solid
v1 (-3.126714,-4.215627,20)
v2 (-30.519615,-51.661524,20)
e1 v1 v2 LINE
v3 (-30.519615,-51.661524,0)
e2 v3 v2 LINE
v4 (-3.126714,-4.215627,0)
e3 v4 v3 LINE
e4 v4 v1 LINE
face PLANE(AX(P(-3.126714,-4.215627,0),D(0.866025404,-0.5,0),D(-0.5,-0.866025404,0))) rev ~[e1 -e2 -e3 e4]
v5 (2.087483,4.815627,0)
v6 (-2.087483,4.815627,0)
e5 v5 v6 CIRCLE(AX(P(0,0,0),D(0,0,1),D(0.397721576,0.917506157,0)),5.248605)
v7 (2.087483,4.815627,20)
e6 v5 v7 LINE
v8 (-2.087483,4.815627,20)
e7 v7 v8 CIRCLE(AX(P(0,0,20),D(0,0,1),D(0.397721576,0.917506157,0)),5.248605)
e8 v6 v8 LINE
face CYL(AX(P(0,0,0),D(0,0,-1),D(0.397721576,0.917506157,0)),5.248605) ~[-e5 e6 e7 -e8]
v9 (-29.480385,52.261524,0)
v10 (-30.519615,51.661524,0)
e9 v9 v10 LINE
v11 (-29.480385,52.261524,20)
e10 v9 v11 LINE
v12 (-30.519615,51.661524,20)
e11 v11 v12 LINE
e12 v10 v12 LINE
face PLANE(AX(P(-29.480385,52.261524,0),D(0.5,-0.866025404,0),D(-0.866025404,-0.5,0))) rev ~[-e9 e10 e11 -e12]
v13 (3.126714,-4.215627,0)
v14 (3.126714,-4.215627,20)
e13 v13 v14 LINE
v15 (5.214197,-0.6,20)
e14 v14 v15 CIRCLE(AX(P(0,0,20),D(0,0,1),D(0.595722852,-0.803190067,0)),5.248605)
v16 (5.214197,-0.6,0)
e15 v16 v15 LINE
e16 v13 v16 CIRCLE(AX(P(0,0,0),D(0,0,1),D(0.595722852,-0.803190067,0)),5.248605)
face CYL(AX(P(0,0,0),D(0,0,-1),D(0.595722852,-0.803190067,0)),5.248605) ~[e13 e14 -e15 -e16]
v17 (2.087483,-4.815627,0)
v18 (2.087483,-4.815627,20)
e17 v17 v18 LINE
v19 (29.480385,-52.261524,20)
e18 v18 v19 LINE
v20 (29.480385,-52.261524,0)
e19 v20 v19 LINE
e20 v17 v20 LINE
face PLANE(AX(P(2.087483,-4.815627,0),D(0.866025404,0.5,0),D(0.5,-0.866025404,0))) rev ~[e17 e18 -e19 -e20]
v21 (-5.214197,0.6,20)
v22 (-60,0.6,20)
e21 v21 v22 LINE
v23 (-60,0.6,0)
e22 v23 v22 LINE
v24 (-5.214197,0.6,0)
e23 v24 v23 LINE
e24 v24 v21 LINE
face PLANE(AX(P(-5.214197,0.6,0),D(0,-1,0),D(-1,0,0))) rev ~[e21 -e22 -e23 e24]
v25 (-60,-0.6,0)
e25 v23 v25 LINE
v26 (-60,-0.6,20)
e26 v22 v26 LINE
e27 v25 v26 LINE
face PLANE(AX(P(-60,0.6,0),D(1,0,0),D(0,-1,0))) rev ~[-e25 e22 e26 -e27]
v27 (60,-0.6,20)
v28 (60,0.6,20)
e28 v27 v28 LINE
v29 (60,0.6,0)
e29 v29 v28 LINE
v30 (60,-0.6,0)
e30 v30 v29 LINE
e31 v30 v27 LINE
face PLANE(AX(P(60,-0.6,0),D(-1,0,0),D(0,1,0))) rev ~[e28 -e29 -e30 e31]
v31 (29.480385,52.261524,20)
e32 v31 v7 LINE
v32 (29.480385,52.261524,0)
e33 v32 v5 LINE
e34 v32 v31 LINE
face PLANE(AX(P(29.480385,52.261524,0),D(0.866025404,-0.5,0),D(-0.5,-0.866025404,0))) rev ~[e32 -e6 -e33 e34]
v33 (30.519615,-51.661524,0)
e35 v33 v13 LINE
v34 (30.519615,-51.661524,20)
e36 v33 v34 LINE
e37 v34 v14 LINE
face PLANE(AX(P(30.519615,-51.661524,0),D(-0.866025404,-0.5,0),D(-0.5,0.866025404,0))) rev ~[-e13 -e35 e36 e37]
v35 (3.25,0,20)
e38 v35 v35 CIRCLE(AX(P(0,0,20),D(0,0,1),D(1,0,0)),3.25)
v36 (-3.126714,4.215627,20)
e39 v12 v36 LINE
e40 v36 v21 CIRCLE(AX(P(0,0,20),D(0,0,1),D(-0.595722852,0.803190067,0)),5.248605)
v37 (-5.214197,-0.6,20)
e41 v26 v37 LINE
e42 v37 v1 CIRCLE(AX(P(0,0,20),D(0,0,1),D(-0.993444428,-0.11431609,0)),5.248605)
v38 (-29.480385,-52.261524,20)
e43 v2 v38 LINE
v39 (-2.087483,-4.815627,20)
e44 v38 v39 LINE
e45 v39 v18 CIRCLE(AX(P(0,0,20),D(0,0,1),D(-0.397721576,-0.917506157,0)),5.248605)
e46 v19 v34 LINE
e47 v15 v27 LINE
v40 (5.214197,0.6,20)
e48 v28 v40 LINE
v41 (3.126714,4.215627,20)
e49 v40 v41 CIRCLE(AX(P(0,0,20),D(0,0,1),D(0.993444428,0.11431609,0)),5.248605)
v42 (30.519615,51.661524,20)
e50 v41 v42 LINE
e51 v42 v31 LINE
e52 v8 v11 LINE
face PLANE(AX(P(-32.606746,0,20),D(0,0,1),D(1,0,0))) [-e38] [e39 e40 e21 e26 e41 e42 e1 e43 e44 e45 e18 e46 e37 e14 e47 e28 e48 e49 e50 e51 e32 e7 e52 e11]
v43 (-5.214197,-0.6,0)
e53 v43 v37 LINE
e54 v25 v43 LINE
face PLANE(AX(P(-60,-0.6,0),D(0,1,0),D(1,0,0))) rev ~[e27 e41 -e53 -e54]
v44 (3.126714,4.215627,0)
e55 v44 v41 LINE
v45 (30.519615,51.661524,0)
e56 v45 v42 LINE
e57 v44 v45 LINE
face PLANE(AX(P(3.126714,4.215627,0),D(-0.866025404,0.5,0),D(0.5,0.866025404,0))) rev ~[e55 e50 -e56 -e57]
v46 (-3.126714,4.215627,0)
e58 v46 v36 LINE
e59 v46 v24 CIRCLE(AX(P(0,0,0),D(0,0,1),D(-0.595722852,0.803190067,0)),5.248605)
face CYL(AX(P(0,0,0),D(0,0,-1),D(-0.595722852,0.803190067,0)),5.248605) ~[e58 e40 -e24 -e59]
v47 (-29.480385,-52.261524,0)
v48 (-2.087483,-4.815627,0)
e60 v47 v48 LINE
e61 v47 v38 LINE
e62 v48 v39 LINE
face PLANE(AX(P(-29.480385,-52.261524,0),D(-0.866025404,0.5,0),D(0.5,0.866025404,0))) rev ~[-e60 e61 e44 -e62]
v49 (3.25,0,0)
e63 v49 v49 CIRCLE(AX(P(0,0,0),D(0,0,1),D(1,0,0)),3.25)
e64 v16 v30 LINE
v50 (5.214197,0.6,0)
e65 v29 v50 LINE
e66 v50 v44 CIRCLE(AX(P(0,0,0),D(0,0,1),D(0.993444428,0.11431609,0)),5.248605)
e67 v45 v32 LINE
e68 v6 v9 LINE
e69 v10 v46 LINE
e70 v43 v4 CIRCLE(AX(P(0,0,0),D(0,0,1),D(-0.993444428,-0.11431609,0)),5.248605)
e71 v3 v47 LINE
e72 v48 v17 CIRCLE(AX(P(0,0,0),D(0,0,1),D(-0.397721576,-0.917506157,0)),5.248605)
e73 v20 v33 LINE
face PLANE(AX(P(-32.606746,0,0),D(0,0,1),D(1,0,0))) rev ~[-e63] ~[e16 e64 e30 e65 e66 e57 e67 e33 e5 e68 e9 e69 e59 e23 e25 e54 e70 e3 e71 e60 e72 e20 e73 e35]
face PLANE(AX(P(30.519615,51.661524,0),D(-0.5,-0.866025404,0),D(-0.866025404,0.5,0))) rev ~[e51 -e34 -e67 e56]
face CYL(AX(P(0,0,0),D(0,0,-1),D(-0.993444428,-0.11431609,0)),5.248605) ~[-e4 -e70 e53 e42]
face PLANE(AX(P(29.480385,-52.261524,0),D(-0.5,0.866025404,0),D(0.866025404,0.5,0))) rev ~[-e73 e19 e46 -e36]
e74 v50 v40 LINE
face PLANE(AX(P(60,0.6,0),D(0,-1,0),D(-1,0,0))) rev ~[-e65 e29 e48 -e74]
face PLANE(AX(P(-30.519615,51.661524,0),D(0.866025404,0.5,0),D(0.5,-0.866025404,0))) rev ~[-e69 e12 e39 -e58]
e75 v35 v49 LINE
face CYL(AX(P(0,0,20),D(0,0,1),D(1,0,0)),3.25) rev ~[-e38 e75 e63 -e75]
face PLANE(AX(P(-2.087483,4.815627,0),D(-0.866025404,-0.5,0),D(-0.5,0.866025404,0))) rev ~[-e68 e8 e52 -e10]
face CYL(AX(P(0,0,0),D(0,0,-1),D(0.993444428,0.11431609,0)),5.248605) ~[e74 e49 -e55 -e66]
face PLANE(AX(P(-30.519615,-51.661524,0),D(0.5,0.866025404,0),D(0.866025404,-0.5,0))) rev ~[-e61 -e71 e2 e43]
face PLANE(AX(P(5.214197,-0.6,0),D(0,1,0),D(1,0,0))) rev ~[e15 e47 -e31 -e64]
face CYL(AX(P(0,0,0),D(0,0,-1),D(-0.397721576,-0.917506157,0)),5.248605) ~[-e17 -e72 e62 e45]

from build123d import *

# Parameters (mm, degrees)
F1_DEPTH = 20
F2_R     = 3.25
F3_DEPTH = 20.001


with BuildPart() as f1:
    # F0 (on Top) → F1 (new body)
    with BuildSketch(Plane.XY):
        with BuildLine():
            Line((-5.2141973622, 0.6), (-60, 0.6))
            Line((-60, 0.6), (-60, -0.6))
            Line((-60, -0.6), (-5.2141973622, -0.6))
            ThreePointArc((-5.2141973622, -0.6), (-5.2486049701, 0), (-5.2141973622, 0.6))
        make_face()
        with BuildLine():
            ThreePointArc((-3.1267139234, 4.215627376), (-4.5454252385, 2.624302485), (-5.2141973622, 0.6))
            Line((-5.2141973622, 0.6), (-1.0392304845, 0.6))
            Line((-1.0392304845, 0.6), (-3.1267139234, 4.215627376))
        make_face()
        with BuildLine():
            Line((-1.0392304845, 0.6), (-5.2141973622, 0.6))
            ThreePointArc((-5.2141973622, 0.6), (-5.2486049701, 0), (-5.2141973622, -0.6))
            Line((-5.2141973622, -0.6), (-1.0392304845, -0.6))
            Line((-1.0392304845, -0.6), (-0.692820323, 0))
            Line((-0.692820323, 0), (-1.0392304845, 0.6))
        make_face()
        with BuildLine():
            Line((-3.1267139234, 4.215627376), (-1.0392304845, 0.6))
            Line((-1.0392304845, 0.6), (-0.3464101615, 0.6))
            Line((-0.3464101615, 0.6), (0, 1.2))
            Line((0, 1.2), (-2.0874834388, 4.815627376))
            ThreePointArc((-2.0874834388, 4.815627376), (-2.624302485, 4.5454252385), (-3.1267139234, 4.215627376))
        make_face()
        with BuildLine():
            Line((-30.5196152423, 51.6615242271), (-3.1267139234, 4.215627376))
            ThreePointArc((-3.1267139234, 4.215627376), (-2.624302485, 4.5454252385), (-2.0874834388, 4.815627376))
            Line((-2.0874834388, 4.815627376), (-29.4803847577, 52.2615242271))
            Line((-29.4803847577, 52.2615242271), (-30.5196152423, 51.6615242271))
        make_face()
        with BuildLine():
            Line((-1.0392304845, -0.6), (-5.2141973622, -0.6))
            ThreePointArc((-5.2141973622, -0.6), (-4.5454252385, -2.624302485), (-3.1267139234, -4.215627376))
            Line((-3.1267139234, -4.215627376), (-1.0392304845, -0.6))
        make_face()
        with BuildLine():
            ThreePointArc((2.0874834388, 4.815627376), (0, 5.2486049701), (-2.0874834388, 4.815627376))
            Line((-2.0874834388, 4.815627376), (0, 1.2))
            Line((0, 1.2), (2.0874834388, 4.815627376))
        make_face()
        with BuildLine():
            Line((-0.3464101615, -0.6), (-1.0392304845, -0.6))
            Line((-1.0392304845, -0.6), (-3.1267139234, -4.215627376))
            ThreePointArc((-3.1267139234, -4.215627376), (-2.624302485, -4.5454252385), (-2.0874834388, -4.815627376))
            Line((-2.0874834388, -4.815627376), (0, -1.2))
            Line((0, -1.2), (-0.3464101615, -0.6))
        make_face()
        with BuildLine():
            ThreePointArc((-2.0874834388, -4.815627376), (-2.624302485, -4.5454252385), (-3.1267139234, -4.215627376))
            Line((-3.1267139234, -4.215627376), (-30.5196152423, -51.6615242271))
            Line((-30.5196152423, -51.6615242271), (-29.4803847577, -52.2615242271))
            Line((-29.4803847577, -52.2615242271), (-2.0874834388, -4.815627376))
        make_face()
        with BuildLine():
            Line((2.0874834388, 4.815627376), (0, 1.2))
            Line((0, 1.2), (0.3464101615, 0.6))
            Line((0.3464101615, 0.6), (1.0392304845, 0.6))
            Line((1.0392304845, 0.6), (3.1267139234, 4.215627376))
            ThreePointArc((3.1267139234, 4.215627376), (2.624302485, 4.5454252385), (2.0874834388, 4.815627376))
        make_face()
        with BuildLine():
            Line((29.4803847577, 52.2615242271), (2.0874834388, 4.815627376))
            ThreePointArc((2.0874834388, 4.815627376), (2.624302485, 4.5454252385), (3.1267139234, 4.215627376))
            Line((3.1267139234, 4.215627376), (30.5196152423, 51.6615242271))
            Line((30.5196152423, 51.6615242271), (29.4803847577, 52.2615242271))
        make_face()
        with BuildLine():
            Line((0, -1.2), (-2.0874834388, -4.815627376))
            ThreePointArc((-2.0874834388, -4.815627376), (0, -5.2486049701), (2.0874834388, -4.815627376))
            Line((2.0874834388, -4.815627376), (0, -1.2))
        make_face()
        with BuildLine():
            ThreePointArc((5.2141973622, 0.6), (4.5454252385, 2.624302485), (3.1267139234, 4.215627376))
            Line((3.1267139234, 4.215627376), (1.0392304845, 0.6))
            Line((1.0392304845, 0.6), (5.2141973622, 0.6))
        make_face()
        with BuildLine():
            Line((0.3464101615, -0.6), (0, -1.2))
            Line((0, -1.2), (2.0874834388, -4.815627376))
            ThreePointArc((2.0874834388, -4.815627376), (2.624302485, -4.5454252385), (3.1267139234, -4.215627376))
            Line((3.1267139234, -4.215627376), (1.0392304845, -0.6))
            Line((1.0392304845, -0.6), (0.3464101615, -0.6))
        make_face()
        with BuildLine():
            ThreePointArc((3.1267139234, -4.215627376), (2.624302485, -4.5454252385), (2.0874834388, -4.815627376))
            Line((2.0874834388, -4.815627376), (29.4803847577, -52.2615242271))
            Line((29.4803847577, -52.2615242271), (30.5196152423, -51.6615242271))
            Line((30.5196152423, -51.6615242271), (3.1267139234, -4.215627376))
        make_face()
        with BuildLine():
            Line((5.2141973622, 0.6), (1.0392304845, 0.6))
            Line((1.0392304845, 0.6), (0.692820323, 0))
            Line((0.692820323, 0), (1.0392304845, -0.6))
            Line((1.0392304845, -0.6), (5.2141973622, -0.6))
            ThreePointArc((5.2141973622, -0.6), (5.2399960077, -0.3004928799), (5.2486049701, 0))
            ThreePointArc((5.2486049701, 0), (5.2399960077, 0.3004928799), (5.2141973622, 0.6))
        make_face()
        with BuildLine():
            Line((60, 0.6), (5.2141973622, 0.6))
            ThreePointArc((5.2141973622, 0.6), (5.2399960077, 0.3004928799), (5.2486049701, 0))
            ThreePointArc((5.2486049701, 0), (5.2399960077, -0.3004928799), (5.2141973622, -0.6))
            Line((5.2141973622, -0.6), (60, -0.6))
            Line((60, -0.6), (60, 0.6))
        make_face()
        with BuildLine():
            Line((1.0392304845, -0.6), (3.1267139234, -4.215627376))
            ThreePointArc((3.1267139234, -4.215627376), (4.5454252385, -2.624302485), (5.2141973622, -0.6))
            Line((5.2141973622, -0.6), (1.0392304845, -0.6))
        make_face()
    extrude(amount=F1_DEPTH)

    # F2 (on face) → F3 (cut, through all)
    with BuildSketch(Plane.XY.offset(20)):
        Circle(F2_R)
        Polygon((1.0392304845, 0.6), (0.692820323, 0), (1.0392304845, -0.6), (0.3464101615, -0.6), (0, -1.2), (-0.3464101615, -0.6), (-1.0392304845, -0.6), (-0.692820323, 0), (-1.0392304845, 0.6), (-0.3464101615, 0.6), (0, 1.2), (0.3464101615, 0.6), align=None, mode=Mode.SUBTRACT)
    extrude(amount=-F3_DEPTH, mode=Mode.SUBTRACT)


solid = f1.part
